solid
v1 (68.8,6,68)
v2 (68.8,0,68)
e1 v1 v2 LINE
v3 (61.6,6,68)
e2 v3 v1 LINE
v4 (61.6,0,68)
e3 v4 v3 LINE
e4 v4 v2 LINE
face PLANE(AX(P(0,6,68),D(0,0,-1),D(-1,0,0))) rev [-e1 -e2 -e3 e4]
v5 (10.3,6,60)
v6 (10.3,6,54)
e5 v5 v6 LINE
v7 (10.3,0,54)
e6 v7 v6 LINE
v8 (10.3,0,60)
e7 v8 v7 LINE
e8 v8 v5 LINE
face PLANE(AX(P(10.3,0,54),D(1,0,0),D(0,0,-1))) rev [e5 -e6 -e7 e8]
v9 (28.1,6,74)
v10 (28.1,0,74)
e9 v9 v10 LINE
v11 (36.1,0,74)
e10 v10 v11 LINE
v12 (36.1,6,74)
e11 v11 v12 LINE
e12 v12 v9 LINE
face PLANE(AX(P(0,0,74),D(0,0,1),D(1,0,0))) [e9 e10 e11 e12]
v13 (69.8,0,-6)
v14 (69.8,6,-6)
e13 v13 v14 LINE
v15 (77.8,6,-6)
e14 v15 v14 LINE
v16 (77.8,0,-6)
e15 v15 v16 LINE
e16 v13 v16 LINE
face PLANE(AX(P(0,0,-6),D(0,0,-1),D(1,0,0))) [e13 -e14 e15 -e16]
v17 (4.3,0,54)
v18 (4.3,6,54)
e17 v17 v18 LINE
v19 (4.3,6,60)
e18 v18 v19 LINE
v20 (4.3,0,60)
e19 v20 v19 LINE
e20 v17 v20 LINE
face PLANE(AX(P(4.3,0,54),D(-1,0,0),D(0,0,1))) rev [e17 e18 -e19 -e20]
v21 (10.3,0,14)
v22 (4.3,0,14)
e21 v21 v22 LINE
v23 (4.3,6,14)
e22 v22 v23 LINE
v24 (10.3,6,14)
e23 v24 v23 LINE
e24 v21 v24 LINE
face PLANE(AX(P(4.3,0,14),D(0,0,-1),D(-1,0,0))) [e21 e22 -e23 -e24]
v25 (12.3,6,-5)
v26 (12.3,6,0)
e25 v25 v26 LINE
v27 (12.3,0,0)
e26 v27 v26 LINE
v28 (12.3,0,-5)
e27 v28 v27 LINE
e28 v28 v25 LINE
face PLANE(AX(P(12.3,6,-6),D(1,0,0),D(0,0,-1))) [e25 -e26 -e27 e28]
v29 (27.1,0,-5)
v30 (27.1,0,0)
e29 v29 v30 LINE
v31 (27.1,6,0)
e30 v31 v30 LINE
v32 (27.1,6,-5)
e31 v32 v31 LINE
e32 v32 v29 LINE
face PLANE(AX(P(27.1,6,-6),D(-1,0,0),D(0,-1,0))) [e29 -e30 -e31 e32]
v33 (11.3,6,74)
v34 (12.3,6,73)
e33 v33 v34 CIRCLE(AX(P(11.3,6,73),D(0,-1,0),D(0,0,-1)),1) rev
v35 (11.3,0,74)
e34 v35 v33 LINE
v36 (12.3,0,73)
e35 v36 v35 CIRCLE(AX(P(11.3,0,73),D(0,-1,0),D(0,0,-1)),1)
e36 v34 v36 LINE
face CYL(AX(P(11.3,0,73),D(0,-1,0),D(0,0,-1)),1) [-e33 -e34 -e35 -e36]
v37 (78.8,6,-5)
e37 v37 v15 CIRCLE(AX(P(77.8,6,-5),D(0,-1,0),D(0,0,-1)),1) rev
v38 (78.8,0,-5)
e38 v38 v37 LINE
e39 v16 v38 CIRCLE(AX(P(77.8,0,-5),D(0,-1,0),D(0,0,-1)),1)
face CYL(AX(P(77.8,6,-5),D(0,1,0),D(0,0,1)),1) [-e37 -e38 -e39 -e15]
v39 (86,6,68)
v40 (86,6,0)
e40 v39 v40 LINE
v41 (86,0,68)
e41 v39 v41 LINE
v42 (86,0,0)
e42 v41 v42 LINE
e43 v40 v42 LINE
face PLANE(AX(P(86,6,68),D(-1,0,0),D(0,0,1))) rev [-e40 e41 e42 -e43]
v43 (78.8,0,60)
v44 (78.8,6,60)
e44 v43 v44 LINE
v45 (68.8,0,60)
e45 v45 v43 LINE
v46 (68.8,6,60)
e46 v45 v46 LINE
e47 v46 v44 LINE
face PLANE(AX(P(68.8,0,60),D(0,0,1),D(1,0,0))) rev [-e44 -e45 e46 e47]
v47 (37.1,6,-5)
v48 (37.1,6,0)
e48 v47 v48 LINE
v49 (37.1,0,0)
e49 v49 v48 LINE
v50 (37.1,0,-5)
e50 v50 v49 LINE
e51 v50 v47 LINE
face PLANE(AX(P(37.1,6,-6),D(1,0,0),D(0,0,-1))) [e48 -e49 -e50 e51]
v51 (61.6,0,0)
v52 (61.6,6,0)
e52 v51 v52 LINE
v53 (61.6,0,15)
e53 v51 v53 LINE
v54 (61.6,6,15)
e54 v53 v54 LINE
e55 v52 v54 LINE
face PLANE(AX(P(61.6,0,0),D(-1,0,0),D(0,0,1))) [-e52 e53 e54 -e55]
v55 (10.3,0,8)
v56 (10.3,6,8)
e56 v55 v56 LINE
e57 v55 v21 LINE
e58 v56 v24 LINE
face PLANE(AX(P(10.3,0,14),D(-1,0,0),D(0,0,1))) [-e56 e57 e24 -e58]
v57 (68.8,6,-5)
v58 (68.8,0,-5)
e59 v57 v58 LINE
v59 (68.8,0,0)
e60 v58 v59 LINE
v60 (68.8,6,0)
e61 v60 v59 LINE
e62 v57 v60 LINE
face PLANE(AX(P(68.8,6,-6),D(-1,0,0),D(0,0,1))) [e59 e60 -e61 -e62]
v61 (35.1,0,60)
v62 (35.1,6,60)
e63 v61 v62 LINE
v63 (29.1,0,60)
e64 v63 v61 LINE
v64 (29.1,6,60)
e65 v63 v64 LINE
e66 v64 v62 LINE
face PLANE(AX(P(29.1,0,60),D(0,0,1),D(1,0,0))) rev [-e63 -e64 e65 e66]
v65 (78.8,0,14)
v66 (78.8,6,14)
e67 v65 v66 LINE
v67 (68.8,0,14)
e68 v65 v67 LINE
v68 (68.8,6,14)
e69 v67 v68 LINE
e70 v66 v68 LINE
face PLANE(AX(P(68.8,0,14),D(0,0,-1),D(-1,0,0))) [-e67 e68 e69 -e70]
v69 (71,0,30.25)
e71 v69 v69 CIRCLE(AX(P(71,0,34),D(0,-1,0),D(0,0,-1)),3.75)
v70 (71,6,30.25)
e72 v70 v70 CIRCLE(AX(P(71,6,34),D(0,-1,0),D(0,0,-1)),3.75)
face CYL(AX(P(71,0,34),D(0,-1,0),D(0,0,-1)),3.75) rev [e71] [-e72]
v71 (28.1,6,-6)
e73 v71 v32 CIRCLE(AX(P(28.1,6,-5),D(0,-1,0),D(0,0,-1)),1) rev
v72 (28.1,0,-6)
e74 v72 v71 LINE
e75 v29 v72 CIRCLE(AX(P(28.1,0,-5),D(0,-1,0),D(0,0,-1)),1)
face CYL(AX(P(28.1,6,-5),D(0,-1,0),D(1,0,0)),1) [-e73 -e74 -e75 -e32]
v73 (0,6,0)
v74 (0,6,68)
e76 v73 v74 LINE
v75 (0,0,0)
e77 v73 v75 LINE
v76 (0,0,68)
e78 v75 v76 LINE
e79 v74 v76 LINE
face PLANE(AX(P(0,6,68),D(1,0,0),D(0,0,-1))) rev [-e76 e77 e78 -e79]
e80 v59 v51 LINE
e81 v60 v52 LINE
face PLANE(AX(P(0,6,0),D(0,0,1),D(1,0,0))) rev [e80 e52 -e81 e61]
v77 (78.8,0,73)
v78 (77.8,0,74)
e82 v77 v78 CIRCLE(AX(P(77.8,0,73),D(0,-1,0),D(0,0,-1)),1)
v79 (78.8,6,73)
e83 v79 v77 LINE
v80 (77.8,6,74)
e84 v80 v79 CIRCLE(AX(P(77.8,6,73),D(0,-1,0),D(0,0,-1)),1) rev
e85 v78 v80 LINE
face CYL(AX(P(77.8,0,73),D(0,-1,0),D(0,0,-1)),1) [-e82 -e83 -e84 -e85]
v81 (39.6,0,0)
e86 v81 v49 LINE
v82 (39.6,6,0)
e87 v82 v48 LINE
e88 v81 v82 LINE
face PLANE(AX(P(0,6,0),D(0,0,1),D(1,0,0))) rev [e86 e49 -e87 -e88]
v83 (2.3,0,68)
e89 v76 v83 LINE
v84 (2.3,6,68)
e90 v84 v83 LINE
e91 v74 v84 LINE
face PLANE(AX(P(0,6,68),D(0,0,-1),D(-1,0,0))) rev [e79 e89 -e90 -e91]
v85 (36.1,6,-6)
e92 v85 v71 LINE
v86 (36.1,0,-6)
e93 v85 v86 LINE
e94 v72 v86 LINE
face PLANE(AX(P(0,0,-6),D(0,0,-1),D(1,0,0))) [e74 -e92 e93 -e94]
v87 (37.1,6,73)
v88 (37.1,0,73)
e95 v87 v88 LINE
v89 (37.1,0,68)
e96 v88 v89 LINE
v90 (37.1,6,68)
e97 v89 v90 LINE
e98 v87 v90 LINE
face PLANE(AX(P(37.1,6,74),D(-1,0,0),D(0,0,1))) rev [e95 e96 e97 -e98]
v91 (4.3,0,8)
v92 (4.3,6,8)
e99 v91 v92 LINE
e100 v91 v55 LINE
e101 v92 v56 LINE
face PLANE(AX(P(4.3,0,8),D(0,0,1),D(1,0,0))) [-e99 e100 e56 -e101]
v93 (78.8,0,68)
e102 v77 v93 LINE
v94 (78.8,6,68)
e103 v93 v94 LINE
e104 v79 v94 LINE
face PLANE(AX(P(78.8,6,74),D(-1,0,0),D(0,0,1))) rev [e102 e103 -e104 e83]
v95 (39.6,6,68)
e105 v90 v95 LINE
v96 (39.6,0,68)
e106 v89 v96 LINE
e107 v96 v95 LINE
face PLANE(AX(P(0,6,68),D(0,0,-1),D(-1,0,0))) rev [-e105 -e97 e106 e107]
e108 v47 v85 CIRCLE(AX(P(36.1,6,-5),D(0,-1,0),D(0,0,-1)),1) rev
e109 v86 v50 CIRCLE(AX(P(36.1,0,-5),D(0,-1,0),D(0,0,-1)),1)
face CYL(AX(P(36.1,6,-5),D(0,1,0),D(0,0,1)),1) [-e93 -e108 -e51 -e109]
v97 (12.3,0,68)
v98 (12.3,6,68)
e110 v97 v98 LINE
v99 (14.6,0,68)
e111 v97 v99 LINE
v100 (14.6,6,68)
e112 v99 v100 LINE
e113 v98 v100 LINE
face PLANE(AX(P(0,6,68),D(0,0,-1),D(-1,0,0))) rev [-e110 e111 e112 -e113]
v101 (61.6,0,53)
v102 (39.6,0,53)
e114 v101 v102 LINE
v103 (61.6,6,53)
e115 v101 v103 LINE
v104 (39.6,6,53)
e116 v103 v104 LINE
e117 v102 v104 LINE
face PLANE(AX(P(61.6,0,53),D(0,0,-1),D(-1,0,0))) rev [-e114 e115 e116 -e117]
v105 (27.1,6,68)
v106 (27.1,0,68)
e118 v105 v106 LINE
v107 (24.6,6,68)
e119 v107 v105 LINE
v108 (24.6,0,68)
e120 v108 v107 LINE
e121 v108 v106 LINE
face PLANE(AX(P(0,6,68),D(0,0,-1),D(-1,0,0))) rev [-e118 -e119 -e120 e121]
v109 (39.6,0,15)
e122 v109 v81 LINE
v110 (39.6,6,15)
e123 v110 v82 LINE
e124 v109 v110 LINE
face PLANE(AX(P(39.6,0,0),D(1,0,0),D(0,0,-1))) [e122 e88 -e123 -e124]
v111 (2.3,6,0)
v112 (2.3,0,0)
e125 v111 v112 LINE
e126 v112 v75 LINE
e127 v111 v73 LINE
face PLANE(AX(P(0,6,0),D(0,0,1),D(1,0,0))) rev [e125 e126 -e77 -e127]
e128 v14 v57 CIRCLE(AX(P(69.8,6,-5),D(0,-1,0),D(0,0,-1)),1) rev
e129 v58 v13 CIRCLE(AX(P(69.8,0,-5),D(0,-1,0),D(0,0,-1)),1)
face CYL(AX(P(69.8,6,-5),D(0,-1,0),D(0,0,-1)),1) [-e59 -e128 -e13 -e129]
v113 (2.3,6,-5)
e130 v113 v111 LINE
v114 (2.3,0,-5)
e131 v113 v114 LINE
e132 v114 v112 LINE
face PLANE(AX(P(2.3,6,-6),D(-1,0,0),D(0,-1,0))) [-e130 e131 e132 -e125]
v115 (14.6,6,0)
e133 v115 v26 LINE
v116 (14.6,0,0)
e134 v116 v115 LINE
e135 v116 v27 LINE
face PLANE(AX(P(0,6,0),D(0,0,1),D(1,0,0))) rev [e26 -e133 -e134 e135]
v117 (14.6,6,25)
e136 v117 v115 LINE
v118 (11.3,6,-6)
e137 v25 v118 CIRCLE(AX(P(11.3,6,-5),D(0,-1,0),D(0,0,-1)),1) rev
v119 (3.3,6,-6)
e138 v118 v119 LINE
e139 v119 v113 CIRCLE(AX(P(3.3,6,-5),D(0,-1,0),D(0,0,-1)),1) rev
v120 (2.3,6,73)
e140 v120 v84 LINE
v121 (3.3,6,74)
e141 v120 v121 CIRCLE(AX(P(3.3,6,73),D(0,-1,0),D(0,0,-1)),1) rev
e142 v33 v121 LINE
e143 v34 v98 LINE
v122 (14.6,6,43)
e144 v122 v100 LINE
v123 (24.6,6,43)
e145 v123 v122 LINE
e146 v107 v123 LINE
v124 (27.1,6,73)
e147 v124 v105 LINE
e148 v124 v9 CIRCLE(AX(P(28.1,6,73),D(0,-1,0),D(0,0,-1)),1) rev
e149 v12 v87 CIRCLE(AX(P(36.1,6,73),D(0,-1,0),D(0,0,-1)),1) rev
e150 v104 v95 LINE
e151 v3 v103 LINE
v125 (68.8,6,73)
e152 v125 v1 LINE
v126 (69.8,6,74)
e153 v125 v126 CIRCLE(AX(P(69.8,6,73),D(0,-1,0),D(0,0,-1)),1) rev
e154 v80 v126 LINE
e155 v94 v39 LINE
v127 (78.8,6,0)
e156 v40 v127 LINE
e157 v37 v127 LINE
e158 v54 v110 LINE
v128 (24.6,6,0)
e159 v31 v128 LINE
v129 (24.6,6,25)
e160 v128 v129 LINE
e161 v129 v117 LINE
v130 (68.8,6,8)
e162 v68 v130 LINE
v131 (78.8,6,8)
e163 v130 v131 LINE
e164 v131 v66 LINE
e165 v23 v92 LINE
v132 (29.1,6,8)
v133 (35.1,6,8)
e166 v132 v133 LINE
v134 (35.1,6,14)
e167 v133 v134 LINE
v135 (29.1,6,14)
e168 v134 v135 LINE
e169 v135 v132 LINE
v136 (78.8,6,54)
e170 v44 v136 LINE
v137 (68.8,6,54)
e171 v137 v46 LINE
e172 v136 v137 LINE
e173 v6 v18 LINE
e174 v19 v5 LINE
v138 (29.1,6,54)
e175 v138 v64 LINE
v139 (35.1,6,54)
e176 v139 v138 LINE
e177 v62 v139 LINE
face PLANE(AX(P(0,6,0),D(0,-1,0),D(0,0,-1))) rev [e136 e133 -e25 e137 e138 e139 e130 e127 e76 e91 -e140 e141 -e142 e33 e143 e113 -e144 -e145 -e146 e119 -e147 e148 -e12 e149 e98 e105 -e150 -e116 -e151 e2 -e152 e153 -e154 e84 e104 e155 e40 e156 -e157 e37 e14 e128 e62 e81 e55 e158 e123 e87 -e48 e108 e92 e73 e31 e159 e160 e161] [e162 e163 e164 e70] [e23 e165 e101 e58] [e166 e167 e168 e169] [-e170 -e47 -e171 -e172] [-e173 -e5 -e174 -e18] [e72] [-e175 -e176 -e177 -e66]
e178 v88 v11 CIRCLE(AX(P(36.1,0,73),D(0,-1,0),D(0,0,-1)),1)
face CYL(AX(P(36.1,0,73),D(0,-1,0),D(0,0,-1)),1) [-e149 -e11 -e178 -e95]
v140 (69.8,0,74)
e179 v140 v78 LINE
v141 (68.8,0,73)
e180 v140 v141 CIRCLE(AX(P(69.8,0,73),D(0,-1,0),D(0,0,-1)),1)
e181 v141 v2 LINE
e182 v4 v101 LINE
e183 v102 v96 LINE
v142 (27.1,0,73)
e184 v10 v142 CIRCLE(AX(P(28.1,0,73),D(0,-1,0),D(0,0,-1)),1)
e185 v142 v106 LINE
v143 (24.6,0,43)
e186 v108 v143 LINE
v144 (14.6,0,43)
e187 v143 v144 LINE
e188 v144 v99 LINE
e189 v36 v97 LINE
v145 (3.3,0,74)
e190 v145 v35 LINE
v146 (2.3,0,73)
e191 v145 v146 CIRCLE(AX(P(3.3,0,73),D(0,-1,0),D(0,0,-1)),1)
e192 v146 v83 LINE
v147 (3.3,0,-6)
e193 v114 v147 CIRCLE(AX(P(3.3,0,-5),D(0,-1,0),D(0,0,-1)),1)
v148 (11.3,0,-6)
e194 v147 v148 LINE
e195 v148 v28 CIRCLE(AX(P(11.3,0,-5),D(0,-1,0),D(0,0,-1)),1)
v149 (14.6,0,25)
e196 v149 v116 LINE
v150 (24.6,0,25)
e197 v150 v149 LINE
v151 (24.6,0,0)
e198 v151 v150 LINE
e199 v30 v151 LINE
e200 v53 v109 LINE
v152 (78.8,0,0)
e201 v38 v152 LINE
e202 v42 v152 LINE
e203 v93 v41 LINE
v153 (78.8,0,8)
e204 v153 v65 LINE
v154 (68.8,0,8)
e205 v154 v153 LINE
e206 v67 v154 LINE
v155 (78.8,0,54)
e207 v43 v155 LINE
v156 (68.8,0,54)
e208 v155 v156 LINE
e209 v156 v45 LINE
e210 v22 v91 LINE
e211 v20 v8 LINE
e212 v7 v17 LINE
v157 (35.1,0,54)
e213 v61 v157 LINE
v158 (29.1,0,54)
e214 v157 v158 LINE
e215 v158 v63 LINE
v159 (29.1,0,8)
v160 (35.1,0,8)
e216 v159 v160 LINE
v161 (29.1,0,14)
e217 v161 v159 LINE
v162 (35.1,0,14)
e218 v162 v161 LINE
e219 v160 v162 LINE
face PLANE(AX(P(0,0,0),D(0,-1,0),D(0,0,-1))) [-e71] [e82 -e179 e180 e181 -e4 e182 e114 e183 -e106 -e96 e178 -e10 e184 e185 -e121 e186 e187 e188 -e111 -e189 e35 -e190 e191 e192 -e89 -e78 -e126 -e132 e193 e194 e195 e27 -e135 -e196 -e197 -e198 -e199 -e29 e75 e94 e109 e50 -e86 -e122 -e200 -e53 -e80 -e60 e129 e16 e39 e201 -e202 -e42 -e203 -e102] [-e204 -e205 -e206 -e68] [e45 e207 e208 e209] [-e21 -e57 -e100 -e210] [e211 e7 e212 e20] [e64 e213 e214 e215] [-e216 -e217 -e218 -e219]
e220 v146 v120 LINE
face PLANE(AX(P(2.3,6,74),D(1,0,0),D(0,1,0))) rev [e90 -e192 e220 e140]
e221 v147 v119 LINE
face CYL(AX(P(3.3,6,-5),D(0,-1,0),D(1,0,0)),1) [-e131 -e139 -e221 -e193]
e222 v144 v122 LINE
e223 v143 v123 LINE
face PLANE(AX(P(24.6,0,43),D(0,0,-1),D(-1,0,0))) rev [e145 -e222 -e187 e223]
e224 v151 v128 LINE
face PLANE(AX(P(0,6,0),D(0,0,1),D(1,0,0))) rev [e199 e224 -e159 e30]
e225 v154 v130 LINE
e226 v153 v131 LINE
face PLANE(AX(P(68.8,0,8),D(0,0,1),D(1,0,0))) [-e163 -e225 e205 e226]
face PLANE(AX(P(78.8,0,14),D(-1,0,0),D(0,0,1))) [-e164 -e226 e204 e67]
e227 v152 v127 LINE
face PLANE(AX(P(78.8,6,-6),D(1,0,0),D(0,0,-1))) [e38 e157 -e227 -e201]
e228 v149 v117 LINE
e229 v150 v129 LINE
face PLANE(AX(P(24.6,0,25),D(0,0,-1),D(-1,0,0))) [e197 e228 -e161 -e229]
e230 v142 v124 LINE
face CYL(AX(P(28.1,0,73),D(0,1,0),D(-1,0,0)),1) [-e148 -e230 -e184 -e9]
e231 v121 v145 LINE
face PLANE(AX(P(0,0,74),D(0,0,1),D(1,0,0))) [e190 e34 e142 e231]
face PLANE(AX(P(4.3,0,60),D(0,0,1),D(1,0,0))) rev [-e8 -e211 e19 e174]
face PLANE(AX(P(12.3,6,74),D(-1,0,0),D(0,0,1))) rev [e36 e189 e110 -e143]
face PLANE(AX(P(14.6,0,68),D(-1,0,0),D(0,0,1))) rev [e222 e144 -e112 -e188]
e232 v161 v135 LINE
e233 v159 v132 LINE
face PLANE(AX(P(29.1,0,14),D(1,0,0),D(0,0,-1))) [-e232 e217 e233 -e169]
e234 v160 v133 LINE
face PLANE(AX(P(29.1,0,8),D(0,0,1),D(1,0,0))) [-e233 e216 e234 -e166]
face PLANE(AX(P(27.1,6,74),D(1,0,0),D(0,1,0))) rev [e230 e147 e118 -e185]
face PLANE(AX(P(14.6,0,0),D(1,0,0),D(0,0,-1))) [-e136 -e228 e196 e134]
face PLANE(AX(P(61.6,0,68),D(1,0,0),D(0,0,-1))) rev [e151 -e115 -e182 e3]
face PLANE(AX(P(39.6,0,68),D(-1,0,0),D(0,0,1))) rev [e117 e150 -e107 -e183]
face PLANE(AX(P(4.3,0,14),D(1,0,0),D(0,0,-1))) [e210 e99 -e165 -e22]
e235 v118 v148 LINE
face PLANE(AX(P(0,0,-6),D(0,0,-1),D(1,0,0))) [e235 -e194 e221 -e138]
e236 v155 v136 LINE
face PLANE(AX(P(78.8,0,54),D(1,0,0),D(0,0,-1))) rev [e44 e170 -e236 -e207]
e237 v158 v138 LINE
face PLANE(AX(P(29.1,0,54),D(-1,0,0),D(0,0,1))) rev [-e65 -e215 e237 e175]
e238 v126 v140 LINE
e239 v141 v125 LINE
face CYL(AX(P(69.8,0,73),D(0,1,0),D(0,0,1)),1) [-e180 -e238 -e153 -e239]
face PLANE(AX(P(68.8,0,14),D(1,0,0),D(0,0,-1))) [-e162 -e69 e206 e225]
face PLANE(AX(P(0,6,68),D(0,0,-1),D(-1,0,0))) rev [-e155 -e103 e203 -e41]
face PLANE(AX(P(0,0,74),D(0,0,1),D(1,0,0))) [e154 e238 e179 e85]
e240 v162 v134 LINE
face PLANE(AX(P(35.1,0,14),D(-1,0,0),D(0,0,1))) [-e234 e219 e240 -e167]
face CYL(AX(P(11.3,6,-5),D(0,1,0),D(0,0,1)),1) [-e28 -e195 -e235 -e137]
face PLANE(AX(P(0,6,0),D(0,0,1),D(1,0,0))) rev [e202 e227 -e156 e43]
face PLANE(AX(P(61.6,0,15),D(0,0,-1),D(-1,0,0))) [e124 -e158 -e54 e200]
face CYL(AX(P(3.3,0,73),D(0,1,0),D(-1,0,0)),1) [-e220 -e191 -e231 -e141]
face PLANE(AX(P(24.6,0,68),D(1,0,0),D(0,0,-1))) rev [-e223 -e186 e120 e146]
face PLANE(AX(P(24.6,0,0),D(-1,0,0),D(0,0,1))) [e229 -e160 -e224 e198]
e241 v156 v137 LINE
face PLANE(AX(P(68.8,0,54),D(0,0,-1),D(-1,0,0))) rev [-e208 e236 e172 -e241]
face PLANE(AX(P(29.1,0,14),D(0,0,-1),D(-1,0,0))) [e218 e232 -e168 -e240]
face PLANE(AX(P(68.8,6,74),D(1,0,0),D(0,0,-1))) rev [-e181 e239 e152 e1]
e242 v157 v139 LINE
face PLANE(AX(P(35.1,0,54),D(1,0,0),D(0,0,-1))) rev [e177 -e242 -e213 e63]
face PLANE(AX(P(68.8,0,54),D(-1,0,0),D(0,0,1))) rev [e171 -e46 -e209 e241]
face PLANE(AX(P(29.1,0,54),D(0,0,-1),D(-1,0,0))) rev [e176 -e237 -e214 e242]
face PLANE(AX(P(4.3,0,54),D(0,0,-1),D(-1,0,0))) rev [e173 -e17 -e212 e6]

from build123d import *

# Parameters (mm, degrees)
SKETCH1_W                  = 86
SKETCH1_H                  = 68
BOSS_EXTRUDE1_DEPTH        = 6
SKETCH2_W                  = 10
SKETCH2_H                  = 25
SKETCH2_W_2                = 22
SKETCH2_H_2                = 15
CUT_EXTRUDE1_DEPTH         = 110.79981785
F_7_5_7_5_DIAMETER_HOLE1_D = 7.5
SKETCH234_W                = 10
SKETCH234_H                = 6
BOSS_EXTRUDE234_DEPTH      = 6
FILLET134_R                = 1
SKETCH2341_W               = 10
SKETCH2341_H               = 6
BOSS_EXTRUDE2341_DEPTH     = 6
FILLET1341_R               = 1
SKETCH2342_W               = 10
SKETCH2342_H               = 6
BOSS_EXTRUDE2342_DEPTH     = 6
FILLET1342_R               = 1
CUT_EXTRUDE11_START        = -3
SKETCH6_W                  = 10
SKETCH6_H                  = 6
CUT_EXTRUDE11_DEPTH        = 6
CUT_EXTRUDE16_DEPTH        = 82.966859266
CUT_EXTRUDE16_DEPTH_BACK   = 82.966859266
SKETCH64_W                 = 6
SKETCH64_H                 = 6
CUT_EXTRUDE18_DEPTH        = 101.225385192
CUT_EXTRUDE18_DEPTH_BACK   = 101.225385192
SKETCH66_W                 = 6
SKETCH66_H                 = 6
MIRROR2_OUTLINE_W          = 10
MIRROR2_OUTLINE_H          = 6
MIRROR2_OUTLINE_W_2        = 6
MIRROR2_DEPTH              = 6
MIRROR2_2_DEPTH            = 6


# Read off the part's stored shape, not the designer's step: Mirror2
with BuildPart() as part:
    # Sketch1 → Boss-Extrude1 (new body)
    with BuildSketch(Plane(origin=(0, 0, 0), x_dir=(1, 0, 0), z_dir=(0, 1, 0))):
        with Locations((43, -34)):
            Rectangle(SKETCH1_W, SKETCH1_H)
    extrude(amount=BOSS_EXTRUDE1_DEPTH)

    # Sketch2 → Cut-Extrude1 (cut, through all)
    with BuildSketch(Plane(origin=(0, 6, 0), x_dir=(1, 0, 0), z_dir=(0, 1, 0))):
        with Locations((19.6, -55.5)):
            Rectangle(SKETCH2_W, SKETCH2_H)
        with Locations((50.6, -60.5)):
            Rectangle(SKETCH2_W_2, SKETCH2_H_2)
    cut_extrude1 = extrude(amount=-CUT_EXTRUDE1_DEPTH, mode=Mode.SUBTRACT)

    # Mirror1: Cut-Extrude1 across plane
    add(cut_extrude1.mirror(Plane.XY.offset(34)), mode=Mode.SUBTRACT)

    # Ø7.5 (7.5) Diameter Hole1 (through all)
    with Locations(Plane(origin=(0, 0, 0), x_dir=(-1, 0, 0), z_dir=(0, -1, 0))):
        with Locations((-71, -34)):
            Hole(F_7_5_7_5_DIAMETER_HOLE1_D / 2)

    # Sketch234 → Boss-Extrude234 (add)
    with BuildSketch(Plane(origin=(73.032221392, 0, 68), x_dir=(1, 0, 0), z_dir=(0, 0, 1))):
        with Locations((0.767778608, 3)):
            Rectangle(SKETCH234_W, SKETCH234_H)
    extrude(amount=BOSS_EXTRUDE234_DEPTH)

    # Fillet134
    fillet134_edges = [part.edges().sort_by_distance(p)[0] for p in [
        (78.8, 3, 74),
        (68.8, 3, 74),
    ]]
    fillet(fillet134_edges, radius=FILLET134_R)

    # Sketch2341 → Boss-Extrude2341 (add)
    with BuildSketch(Plane(origin=(31.332221392, 0, 68), x_dir=(1, 0, 0), z_dir=(0, 0, 1))):
        with Locations((0.767778608, 3)):
            Rectangle(SKETCH2341_W, SKETCH2341_H)
    extrude(amount=BOSS_EXTRUDE2341_DEPTH)

    # Fillet1341
    fillet1341_edges = [part.edges().sort_by_distance(p)[0] for p in [
        (37.1, 3, 74),
        (27.1, 3, 74),
    ]]
    fillet(fillet1341_edges, radius=FILLET1341_R)

    # Sketch2342 → Boss-Extrude2342 (add)
    with BuildSketch(Plane(origin=(6.532221392, 0, 68), x_dir=(1, 0, 0), z_dir=(0, 0, 1))):
        with Locations((0.767778608, 3)):
            Rectangle(SKETCH2342_W, SKETCH2342_H)
    extrude(amount=BOSS_EXTRUDE2342_DEPTH)

    # Fillet1342
    fillet1342_edges = [part.edges().sort_by_distance(p)[0] for p in [
        (12.3, 3, 74),
        (2.3, 3, 74),
    ]]
    fillet(fillet1342_edges, radius=FILLET1342_R)

    # Sketch6 → Cut-Extrude11 (cut)
    with BuildSketch(Plane(origin=(73.032221392, 3, 13), x_dir=(1, 0, 0), z_dir=(0, 1, 0)).offset(CUT_EXTRUDE11_START)):
        with Locations((0.767778608, -44)):
            Rectangle(SKETCH6_W, SKETCH6_H)
    extrude(amount=CUT_EXTRUDE11_DEPTH, mode=Mode.SUBTRACT)

    # Sketch64 → Cut-Extrude16 (cut, two sides: drawn at the far end of the back side and taken through both)
    with BuildSketch(Plane(origin=(31.332221392, 3, 13), x_dir=(1, 0, 0), z_dir=(0, 1, 0)).offset(-CUT_EXTRUDE16_DEPTH_BACK)):
        with Locations((0.767778608, -44)):
            Rectangle(SKETCH64_W, SKETCH64_H)
    extrude(amount=CUT_EXTRUDE16_DEPTH + CUT_EXTRUDE16_DEPTH_BACK, mode=Mode.SUBTRACT)

    # Sketch66 → Cut-Extrude18 (cut, two sides: drawn at the far end of the back side and taken through both)
    with BuildSketch(Plane(origin=(6.532221392, 3, 13), x_dir=(1, 0, 0), z_dir=(0, 1, 0)).offset(-CUT_EXTRUDE18_DEPTH_BACK)):
        with Locations((0.767778608, -44)):
            Rectangle(SKETCH66_W, SKETCH66_H)
    extrude(amount=CUT_EXTRUDE18_DEPTH + CUT_EXTRUDE18_DEPTH_BACK, mode=Mode.SUBTRACT)

    # Mirror2 outline → Mirror2 (cut)
    with BuildSketch(Plane(origin=(0, 0, 0), x_dir=(1, 0, 0), z_dir=(0, 1, 0))):
        with Locations((73.8, -11)):
            Rectangle(MIRROR2_OUTLINE_W, MIRROR2_OUTLINE_H)
        with Locations((32.1, -11)):
            Rectangle(MIRROR2_OUTLINE_W_2, MIRROR2_OUTLINE_H)
        with Locations((7.3, -11)):
            Rectangle(MIRROR2_OUTLINE_W_2, MIRROR2_OUTLINE_H)
    extrude(amount=MIRROR2_DEPTH, mode=Mode.SUBTRACT)

    # Mirror2 2 outline → Mirror2 2 (add)
    with BuildSketch(Plane(origin=(0, 0, 0), x_dir=(1, 0, 0), z_dir=(0, 1, 0))):
        with BuildLine():
            Line((68.8, 0), (78.8, 0))
            Line((78.8, 0), (78.8, 5))
            ThreePointArc((78.8, 5), (78.507106781, 5.707106781), (77.8, 6))
            Line((77.8, 6), (69.8, 6))
            ThreePointArc((69.8, 6), (69.092893219, 5.707106781), (68.8, 5))
            Line((68.8, 5), (68.8, 0))
        make_face()
        with BuildLine():
            Line((27.1, 0), (37.1, 0))
            Line((37.1, 0), (37.1, 5))
            ThreePointArc((37.1, 5), (36.807106781, 5.707106781), (36.1, 6))
            Line((36.1, 6), (28.1, 6))
            ThreePointArc((28.1, 6), (27.392893219, 5.707106781), (27.1, 5))
            Line((27.1, 5), (27.1, 0))
        make_face()
        with BuildLine():
            Line((2.3, 0), (12.3, 0))
            Line((12.3, 0), (12.3, 5))
            ThreePointArc((12.3, 5), (12.007106781, 5.707106781), (11.3, 6))
            Line((11.3, 6), (3.3, 6))
            ThreePointArc((3.3, 6), (2.592893219, 5.707106781), (2.3, 5))
            Line((2.3, 5), (2.3, 0))
        make_face()
    extrude(amount=MIRROR2_2_DEPTH)


solid = part.part
